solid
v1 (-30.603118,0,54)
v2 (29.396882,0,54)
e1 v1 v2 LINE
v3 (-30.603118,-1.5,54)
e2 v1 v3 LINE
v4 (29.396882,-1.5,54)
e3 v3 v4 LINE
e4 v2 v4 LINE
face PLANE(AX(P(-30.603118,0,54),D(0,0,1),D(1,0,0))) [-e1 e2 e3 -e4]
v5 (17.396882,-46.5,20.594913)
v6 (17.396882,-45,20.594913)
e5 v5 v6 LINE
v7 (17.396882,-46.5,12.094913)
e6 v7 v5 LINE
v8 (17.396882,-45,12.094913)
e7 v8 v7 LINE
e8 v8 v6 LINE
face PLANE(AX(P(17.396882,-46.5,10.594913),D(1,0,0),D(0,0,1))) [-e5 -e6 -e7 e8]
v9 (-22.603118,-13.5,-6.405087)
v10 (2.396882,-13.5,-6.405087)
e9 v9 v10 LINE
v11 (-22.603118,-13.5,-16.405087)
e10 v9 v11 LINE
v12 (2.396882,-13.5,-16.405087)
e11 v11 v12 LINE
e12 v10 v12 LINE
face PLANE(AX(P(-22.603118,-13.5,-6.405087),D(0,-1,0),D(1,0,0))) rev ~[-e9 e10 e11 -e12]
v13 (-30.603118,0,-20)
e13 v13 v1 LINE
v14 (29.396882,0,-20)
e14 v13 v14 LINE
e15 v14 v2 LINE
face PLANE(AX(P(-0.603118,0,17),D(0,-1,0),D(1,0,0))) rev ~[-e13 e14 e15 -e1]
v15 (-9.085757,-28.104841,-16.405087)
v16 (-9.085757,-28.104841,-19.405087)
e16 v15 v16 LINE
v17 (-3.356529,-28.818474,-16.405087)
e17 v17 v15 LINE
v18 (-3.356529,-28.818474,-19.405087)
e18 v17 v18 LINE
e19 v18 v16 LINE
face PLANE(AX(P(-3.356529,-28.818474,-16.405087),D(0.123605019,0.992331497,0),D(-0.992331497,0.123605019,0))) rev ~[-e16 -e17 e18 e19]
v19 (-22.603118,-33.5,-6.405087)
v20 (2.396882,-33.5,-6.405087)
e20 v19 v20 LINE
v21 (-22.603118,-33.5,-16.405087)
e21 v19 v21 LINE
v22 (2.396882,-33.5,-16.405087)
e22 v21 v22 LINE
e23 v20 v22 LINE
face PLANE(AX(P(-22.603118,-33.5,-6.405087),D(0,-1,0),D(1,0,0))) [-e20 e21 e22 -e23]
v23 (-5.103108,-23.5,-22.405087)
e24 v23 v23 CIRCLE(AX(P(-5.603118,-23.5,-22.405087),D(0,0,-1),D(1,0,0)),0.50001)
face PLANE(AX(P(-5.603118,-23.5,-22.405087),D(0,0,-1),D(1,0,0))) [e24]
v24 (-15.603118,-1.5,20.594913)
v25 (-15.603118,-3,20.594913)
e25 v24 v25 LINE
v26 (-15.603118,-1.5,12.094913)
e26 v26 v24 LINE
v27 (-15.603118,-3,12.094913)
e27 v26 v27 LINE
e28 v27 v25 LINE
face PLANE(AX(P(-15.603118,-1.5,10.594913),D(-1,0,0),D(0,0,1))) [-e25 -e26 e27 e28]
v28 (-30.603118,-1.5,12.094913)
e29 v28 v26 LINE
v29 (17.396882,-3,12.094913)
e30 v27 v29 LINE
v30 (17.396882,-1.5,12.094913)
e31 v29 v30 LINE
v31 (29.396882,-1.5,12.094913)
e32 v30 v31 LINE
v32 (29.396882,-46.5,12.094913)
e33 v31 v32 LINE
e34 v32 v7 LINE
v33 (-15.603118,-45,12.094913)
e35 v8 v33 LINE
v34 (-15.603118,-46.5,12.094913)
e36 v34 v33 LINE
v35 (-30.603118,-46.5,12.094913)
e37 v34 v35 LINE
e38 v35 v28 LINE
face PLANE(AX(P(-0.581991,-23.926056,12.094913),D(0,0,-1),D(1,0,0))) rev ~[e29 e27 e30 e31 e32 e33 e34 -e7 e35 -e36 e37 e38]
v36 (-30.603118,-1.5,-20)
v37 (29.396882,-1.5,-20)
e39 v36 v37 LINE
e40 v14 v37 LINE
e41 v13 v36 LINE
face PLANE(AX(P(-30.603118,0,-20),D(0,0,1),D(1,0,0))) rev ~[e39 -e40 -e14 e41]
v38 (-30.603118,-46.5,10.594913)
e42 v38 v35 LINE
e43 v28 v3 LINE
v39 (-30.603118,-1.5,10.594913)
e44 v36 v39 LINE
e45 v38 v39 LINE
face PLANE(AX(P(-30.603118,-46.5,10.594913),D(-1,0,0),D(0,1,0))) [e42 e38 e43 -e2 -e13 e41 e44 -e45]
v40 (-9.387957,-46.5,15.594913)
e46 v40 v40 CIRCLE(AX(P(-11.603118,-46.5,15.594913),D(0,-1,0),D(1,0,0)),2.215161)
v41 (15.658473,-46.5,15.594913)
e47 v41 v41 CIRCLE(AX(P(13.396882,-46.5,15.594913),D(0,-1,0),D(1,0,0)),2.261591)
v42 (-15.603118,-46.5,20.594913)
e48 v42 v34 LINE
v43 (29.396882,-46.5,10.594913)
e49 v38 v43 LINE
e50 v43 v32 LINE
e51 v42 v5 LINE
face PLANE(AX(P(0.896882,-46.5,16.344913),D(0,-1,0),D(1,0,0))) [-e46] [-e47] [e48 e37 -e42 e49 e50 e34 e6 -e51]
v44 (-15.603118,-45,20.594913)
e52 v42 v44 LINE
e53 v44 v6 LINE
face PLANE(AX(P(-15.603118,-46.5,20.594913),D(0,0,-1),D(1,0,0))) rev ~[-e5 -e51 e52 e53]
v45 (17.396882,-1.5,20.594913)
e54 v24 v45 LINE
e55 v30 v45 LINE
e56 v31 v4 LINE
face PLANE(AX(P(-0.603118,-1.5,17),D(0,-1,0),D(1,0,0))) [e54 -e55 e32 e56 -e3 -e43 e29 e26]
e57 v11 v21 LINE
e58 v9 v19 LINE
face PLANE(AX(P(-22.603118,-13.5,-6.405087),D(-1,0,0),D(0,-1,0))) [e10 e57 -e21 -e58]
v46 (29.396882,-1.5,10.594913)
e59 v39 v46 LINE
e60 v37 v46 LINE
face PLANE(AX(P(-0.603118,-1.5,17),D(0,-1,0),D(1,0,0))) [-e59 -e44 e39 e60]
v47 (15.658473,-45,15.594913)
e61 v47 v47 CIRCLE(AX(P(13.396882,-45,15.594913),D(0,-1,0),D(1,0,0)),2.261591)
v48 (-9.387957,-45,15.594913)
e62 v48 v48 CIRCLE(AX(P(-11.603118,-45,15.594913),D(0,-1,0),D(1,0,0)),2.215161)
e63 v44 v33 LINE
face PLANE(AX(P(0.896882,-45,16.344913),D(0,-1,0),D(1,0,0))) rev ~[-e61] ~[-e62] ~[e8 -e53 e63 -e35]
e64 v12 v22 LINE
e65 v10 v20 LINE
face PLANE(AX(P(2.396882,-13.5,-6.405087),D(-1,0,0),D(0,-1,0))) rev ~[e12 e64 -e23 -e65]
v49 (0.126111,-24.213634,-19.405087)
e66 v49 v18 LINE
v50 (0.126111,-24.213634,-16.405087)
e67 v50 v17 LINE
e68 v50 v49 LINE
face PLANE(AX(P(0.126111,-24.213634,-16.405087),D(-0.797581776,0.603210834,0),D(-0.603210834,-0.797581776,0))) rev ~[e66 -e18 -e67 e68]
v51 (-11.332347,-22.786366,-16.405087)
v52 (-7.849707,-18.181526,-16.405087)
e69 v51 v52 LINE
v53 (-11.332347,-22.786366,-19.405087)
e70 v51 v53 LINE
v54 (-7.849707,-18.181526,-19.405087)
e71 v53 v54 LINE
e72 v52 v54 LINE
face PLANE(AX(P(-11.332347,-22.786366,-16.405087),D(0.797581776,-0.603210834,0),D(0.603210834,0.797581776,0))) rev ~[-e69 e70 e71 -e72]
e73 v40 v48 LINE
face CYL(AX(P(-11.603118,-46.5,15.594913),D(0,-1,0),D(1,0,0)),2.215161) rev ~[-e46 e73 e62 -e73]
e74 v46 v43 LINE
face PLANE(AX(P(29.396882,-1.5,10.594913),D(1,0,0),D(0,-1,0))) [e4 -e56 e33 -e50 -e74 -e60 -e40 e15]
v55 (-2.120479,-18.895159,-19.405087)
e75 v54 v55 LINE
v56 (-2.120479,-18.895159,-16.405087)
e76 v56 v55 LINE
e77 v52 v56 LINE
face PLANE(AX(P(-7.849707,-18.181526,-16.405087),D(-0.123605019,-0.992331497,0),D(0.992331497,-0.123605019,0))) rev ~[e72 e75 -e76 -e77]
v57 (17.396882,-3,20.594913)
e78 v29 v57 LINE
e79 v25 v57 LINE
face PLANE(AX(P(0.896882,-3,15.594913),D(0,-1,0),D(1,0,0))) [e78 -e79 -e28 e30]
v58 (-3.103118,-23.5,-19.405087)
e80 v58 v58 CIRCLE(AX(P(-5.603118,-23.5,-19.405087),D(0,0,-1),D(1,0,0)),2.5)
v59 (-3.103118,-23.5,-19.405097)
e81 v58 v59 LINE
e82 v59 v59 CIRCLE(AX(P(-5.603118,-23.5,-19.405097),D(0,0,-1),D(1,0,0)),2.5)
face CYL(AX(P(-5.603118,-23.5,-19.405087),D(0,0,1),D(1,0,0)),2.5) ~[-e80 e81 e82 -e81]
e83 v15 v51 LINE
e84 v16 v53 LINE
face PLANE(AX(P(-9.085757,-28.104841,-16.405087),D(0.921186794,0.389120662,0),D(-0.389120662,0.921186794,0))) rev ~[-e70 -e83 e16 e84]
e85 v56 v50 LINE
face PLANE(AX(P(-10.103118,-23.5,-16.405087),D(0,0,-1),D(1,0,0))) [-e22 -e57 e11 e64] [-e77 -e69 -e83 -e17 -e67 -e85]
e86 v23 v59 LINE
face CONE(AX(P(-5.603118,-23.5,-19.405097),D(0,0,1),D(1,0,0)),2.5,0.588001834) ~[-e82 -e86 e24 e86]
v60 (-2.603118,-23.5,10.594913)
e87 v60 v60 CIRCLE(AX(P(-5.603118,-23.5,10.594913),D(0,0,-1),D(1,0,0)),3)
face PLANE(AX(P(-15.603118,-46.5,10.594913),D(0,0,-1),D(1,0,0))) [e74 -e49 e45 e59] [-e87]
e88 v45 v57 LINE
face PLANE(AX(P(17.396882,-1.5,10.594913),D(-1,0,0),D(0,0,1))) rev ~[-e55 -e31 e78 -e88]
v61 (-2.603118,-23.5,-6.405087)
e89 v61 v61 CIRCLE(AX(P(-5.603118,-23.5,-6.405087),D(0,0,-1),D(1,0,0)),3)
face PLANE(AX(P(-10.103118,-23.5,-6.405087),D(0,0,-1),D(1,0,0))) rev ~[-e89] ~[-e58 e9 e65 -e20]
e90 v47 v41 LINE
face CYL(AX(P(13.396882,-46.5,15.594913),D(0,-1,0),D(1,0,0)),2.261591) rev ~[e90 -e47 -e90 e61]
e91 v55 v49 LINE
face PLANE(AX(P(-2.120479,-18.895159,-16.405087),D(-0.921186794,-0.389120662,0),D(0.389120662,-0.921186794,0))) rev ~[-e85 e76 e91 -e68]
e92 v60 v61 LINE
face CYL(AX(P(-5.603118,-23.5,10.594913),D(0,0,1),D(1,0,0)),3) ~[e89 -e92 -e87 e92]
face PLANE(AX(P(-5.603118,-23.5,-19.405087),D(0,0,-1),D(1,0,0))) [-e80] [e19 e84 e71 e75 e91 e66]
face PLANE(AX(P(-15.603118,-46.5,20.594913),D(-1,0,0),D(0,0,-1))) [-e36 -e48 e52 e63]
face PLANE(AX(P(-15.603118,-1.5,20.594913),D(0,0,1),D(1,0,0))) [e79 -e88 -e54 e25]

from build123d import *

# Parameters (mm, degrees)
F0_W      = 60
F0_H      = 74
F1_DEPTH  = 1.5
F2_W      = 33
F2_H      = 10
F3_DEPTH  = 1.5
F5_DEPTH  = 1.5
F6_W      = 33
F6_H      = 8.5
F6_H_2    = 1.5
F7_DEPTH  = 1.5
F8_R      = 2.2151606022
F8_R_2    = 2.2615912584
F9_DEPTH  = 2.5
F10_R     = 3
F11_DEPTH = 17
F12_W     = 25
F12_H     = 20
F12_R     = 3
F13_DEPTH = 10
F15_DEPTH = 3
F16_R     = 2.5
F17_DEPTH = 3
F18_SIZE2 = 2.99999
F18_SIZE  = 1.99999


# Not quite as in the source:
# - a fillet or chamfer is up to 0.001 mm smaller than in the source, because OpenCascade refuses the exact size


with BuildPart() as f1:
    # F0 (on Front) → F1 (new body)
    with BuildSketch(Plane.XZ):
        with Locations((-0.6031179801, 17)):
            Rectangle(F0_W, F0_H)
    extrude(amount=F1_DEPTH)

    # F2 (on face) → F3 (join)
    with BuildSketch(Plane.XZ.offset(1.5)):
        with Locations((0.8968820199, 15.5949131586)):
            Rectangle(F2_W, F2_H)
    extrude(amount=F3_DEPTH)

    # F4 (on face) → F5 (join)
    with BuildSketch(Plane(origin=(0, 0, 10.5949131586), x_dir=(1, 0, 0), z_dir=(0, 0, -1))):
        Polygon((-30.6031179801, 46.5), (-30.6031179801, 1.5), (-15.6031179801, 1.5), (-15.6031179801, 3), (17.3968820199, 3), (17.3968820199, 1.5), (29.3968820199, 1.5), (29.3968820199, 46.5), align=None)
    extrude(amount=-F5_DEPTH)

    # F6 (on face) → F7 (join)
    with BuildSketch(Plane.XZ.offset(46.5)):
        with Locations((0.8968820199, 16.3449131586)):
            Rectangle(F6_W, F6_H)
        with Locations((0.8968820199, 11.3449131586)):
            Rectangle(F6_W, F6_H_2)
    extrude(amount=-F7_DEPTH)

    # F8 (on face) → F9 (cut, symmetric)
    with BuildSketch(Plane.XZ.offset(46.5)):
        with Locations((-11.6031179801, 15.5949131586)):
            Circle(F8_R)
        with Locations((13.3968820199, 15.5949131586)):
            Circle(F8_R_2)
    extrude(amount=F9_DEPTH, both=True, mode=Mode.SUBTRACT)

    # F10 (on face) → F11 (join)
    with BuildSketch(Plane(origin=(0, 0, 10.5949131586), x_dir=(1, 0, 0), z_dir=(0, 0, -1))):
        with Locations((-5.6031179801, 23.5)):
            Circle(F10_R)
    extrude(amount=F11_DEPTH)

    # F12 (on face) → F13 (join)
    with BuildSketch(Plane(origin=(0, 0, -6.4050868414), x_dir=(1, 0, 0), z_dir=(0, 0, -1))):
        with Locations((-10.1031179801, 23.5)):
            Rectangle(F12_W, F12_H)
        with Locations((-5.6031179801, 23.5)):
            Circle(F12_R, mode=Mode.SUBTRACT)
        with Locations((-5.6031179801, 23.5)):
            Circle(F12_R)
    extrude(amount=F13_DEPTH)

    # F14 (on face) → F15 (join)
    with BuildSketch(Plane(origin=(0, 0, -16.4050868414), x_dir=(1, 0, 0), z_dir=(0, 0, -1))):
        Polygon((0.1261105875, 24.2136339076), (-3.3565287892, 28.8184744374), (-9.0857573568, 28.1048405298), (-11.3323465476, 22.7863660924), (-7.8497071709, 18.1815255626), (-2.1204786033, 18.8951594702), align=None)
    extrude(amount=F15_DEPTH)

    # F16 (on face) → F17 (join)
    with BuildSketch(Plane(origin=(0, 0, -19.4050868414), x_dir=(1, 0, 0), z_dir=(0, 0, -1))):
        with Locations((-5.6031179801, 23.5)):
            Circle(F16_R)
    extrude(amount=F17_DEPTH)

    # F18 (size 2 and 3 in the source; OpenCascade refuses exactly that, so slightly less here)
    f18_edges = [f1.edges().sort_by_distance(p)[0] for p in [
        (-8.103118, -23.5, -22.405087),
    ]]
    f18_side = f1.faces().sort_by_distance((-5.603118, -23.5, -22.405087))[0]
    chamfer(f18_edges, length=F18_SIZE, length2=F18_SIZE2, reference=f18_side)


solid = f1.part
